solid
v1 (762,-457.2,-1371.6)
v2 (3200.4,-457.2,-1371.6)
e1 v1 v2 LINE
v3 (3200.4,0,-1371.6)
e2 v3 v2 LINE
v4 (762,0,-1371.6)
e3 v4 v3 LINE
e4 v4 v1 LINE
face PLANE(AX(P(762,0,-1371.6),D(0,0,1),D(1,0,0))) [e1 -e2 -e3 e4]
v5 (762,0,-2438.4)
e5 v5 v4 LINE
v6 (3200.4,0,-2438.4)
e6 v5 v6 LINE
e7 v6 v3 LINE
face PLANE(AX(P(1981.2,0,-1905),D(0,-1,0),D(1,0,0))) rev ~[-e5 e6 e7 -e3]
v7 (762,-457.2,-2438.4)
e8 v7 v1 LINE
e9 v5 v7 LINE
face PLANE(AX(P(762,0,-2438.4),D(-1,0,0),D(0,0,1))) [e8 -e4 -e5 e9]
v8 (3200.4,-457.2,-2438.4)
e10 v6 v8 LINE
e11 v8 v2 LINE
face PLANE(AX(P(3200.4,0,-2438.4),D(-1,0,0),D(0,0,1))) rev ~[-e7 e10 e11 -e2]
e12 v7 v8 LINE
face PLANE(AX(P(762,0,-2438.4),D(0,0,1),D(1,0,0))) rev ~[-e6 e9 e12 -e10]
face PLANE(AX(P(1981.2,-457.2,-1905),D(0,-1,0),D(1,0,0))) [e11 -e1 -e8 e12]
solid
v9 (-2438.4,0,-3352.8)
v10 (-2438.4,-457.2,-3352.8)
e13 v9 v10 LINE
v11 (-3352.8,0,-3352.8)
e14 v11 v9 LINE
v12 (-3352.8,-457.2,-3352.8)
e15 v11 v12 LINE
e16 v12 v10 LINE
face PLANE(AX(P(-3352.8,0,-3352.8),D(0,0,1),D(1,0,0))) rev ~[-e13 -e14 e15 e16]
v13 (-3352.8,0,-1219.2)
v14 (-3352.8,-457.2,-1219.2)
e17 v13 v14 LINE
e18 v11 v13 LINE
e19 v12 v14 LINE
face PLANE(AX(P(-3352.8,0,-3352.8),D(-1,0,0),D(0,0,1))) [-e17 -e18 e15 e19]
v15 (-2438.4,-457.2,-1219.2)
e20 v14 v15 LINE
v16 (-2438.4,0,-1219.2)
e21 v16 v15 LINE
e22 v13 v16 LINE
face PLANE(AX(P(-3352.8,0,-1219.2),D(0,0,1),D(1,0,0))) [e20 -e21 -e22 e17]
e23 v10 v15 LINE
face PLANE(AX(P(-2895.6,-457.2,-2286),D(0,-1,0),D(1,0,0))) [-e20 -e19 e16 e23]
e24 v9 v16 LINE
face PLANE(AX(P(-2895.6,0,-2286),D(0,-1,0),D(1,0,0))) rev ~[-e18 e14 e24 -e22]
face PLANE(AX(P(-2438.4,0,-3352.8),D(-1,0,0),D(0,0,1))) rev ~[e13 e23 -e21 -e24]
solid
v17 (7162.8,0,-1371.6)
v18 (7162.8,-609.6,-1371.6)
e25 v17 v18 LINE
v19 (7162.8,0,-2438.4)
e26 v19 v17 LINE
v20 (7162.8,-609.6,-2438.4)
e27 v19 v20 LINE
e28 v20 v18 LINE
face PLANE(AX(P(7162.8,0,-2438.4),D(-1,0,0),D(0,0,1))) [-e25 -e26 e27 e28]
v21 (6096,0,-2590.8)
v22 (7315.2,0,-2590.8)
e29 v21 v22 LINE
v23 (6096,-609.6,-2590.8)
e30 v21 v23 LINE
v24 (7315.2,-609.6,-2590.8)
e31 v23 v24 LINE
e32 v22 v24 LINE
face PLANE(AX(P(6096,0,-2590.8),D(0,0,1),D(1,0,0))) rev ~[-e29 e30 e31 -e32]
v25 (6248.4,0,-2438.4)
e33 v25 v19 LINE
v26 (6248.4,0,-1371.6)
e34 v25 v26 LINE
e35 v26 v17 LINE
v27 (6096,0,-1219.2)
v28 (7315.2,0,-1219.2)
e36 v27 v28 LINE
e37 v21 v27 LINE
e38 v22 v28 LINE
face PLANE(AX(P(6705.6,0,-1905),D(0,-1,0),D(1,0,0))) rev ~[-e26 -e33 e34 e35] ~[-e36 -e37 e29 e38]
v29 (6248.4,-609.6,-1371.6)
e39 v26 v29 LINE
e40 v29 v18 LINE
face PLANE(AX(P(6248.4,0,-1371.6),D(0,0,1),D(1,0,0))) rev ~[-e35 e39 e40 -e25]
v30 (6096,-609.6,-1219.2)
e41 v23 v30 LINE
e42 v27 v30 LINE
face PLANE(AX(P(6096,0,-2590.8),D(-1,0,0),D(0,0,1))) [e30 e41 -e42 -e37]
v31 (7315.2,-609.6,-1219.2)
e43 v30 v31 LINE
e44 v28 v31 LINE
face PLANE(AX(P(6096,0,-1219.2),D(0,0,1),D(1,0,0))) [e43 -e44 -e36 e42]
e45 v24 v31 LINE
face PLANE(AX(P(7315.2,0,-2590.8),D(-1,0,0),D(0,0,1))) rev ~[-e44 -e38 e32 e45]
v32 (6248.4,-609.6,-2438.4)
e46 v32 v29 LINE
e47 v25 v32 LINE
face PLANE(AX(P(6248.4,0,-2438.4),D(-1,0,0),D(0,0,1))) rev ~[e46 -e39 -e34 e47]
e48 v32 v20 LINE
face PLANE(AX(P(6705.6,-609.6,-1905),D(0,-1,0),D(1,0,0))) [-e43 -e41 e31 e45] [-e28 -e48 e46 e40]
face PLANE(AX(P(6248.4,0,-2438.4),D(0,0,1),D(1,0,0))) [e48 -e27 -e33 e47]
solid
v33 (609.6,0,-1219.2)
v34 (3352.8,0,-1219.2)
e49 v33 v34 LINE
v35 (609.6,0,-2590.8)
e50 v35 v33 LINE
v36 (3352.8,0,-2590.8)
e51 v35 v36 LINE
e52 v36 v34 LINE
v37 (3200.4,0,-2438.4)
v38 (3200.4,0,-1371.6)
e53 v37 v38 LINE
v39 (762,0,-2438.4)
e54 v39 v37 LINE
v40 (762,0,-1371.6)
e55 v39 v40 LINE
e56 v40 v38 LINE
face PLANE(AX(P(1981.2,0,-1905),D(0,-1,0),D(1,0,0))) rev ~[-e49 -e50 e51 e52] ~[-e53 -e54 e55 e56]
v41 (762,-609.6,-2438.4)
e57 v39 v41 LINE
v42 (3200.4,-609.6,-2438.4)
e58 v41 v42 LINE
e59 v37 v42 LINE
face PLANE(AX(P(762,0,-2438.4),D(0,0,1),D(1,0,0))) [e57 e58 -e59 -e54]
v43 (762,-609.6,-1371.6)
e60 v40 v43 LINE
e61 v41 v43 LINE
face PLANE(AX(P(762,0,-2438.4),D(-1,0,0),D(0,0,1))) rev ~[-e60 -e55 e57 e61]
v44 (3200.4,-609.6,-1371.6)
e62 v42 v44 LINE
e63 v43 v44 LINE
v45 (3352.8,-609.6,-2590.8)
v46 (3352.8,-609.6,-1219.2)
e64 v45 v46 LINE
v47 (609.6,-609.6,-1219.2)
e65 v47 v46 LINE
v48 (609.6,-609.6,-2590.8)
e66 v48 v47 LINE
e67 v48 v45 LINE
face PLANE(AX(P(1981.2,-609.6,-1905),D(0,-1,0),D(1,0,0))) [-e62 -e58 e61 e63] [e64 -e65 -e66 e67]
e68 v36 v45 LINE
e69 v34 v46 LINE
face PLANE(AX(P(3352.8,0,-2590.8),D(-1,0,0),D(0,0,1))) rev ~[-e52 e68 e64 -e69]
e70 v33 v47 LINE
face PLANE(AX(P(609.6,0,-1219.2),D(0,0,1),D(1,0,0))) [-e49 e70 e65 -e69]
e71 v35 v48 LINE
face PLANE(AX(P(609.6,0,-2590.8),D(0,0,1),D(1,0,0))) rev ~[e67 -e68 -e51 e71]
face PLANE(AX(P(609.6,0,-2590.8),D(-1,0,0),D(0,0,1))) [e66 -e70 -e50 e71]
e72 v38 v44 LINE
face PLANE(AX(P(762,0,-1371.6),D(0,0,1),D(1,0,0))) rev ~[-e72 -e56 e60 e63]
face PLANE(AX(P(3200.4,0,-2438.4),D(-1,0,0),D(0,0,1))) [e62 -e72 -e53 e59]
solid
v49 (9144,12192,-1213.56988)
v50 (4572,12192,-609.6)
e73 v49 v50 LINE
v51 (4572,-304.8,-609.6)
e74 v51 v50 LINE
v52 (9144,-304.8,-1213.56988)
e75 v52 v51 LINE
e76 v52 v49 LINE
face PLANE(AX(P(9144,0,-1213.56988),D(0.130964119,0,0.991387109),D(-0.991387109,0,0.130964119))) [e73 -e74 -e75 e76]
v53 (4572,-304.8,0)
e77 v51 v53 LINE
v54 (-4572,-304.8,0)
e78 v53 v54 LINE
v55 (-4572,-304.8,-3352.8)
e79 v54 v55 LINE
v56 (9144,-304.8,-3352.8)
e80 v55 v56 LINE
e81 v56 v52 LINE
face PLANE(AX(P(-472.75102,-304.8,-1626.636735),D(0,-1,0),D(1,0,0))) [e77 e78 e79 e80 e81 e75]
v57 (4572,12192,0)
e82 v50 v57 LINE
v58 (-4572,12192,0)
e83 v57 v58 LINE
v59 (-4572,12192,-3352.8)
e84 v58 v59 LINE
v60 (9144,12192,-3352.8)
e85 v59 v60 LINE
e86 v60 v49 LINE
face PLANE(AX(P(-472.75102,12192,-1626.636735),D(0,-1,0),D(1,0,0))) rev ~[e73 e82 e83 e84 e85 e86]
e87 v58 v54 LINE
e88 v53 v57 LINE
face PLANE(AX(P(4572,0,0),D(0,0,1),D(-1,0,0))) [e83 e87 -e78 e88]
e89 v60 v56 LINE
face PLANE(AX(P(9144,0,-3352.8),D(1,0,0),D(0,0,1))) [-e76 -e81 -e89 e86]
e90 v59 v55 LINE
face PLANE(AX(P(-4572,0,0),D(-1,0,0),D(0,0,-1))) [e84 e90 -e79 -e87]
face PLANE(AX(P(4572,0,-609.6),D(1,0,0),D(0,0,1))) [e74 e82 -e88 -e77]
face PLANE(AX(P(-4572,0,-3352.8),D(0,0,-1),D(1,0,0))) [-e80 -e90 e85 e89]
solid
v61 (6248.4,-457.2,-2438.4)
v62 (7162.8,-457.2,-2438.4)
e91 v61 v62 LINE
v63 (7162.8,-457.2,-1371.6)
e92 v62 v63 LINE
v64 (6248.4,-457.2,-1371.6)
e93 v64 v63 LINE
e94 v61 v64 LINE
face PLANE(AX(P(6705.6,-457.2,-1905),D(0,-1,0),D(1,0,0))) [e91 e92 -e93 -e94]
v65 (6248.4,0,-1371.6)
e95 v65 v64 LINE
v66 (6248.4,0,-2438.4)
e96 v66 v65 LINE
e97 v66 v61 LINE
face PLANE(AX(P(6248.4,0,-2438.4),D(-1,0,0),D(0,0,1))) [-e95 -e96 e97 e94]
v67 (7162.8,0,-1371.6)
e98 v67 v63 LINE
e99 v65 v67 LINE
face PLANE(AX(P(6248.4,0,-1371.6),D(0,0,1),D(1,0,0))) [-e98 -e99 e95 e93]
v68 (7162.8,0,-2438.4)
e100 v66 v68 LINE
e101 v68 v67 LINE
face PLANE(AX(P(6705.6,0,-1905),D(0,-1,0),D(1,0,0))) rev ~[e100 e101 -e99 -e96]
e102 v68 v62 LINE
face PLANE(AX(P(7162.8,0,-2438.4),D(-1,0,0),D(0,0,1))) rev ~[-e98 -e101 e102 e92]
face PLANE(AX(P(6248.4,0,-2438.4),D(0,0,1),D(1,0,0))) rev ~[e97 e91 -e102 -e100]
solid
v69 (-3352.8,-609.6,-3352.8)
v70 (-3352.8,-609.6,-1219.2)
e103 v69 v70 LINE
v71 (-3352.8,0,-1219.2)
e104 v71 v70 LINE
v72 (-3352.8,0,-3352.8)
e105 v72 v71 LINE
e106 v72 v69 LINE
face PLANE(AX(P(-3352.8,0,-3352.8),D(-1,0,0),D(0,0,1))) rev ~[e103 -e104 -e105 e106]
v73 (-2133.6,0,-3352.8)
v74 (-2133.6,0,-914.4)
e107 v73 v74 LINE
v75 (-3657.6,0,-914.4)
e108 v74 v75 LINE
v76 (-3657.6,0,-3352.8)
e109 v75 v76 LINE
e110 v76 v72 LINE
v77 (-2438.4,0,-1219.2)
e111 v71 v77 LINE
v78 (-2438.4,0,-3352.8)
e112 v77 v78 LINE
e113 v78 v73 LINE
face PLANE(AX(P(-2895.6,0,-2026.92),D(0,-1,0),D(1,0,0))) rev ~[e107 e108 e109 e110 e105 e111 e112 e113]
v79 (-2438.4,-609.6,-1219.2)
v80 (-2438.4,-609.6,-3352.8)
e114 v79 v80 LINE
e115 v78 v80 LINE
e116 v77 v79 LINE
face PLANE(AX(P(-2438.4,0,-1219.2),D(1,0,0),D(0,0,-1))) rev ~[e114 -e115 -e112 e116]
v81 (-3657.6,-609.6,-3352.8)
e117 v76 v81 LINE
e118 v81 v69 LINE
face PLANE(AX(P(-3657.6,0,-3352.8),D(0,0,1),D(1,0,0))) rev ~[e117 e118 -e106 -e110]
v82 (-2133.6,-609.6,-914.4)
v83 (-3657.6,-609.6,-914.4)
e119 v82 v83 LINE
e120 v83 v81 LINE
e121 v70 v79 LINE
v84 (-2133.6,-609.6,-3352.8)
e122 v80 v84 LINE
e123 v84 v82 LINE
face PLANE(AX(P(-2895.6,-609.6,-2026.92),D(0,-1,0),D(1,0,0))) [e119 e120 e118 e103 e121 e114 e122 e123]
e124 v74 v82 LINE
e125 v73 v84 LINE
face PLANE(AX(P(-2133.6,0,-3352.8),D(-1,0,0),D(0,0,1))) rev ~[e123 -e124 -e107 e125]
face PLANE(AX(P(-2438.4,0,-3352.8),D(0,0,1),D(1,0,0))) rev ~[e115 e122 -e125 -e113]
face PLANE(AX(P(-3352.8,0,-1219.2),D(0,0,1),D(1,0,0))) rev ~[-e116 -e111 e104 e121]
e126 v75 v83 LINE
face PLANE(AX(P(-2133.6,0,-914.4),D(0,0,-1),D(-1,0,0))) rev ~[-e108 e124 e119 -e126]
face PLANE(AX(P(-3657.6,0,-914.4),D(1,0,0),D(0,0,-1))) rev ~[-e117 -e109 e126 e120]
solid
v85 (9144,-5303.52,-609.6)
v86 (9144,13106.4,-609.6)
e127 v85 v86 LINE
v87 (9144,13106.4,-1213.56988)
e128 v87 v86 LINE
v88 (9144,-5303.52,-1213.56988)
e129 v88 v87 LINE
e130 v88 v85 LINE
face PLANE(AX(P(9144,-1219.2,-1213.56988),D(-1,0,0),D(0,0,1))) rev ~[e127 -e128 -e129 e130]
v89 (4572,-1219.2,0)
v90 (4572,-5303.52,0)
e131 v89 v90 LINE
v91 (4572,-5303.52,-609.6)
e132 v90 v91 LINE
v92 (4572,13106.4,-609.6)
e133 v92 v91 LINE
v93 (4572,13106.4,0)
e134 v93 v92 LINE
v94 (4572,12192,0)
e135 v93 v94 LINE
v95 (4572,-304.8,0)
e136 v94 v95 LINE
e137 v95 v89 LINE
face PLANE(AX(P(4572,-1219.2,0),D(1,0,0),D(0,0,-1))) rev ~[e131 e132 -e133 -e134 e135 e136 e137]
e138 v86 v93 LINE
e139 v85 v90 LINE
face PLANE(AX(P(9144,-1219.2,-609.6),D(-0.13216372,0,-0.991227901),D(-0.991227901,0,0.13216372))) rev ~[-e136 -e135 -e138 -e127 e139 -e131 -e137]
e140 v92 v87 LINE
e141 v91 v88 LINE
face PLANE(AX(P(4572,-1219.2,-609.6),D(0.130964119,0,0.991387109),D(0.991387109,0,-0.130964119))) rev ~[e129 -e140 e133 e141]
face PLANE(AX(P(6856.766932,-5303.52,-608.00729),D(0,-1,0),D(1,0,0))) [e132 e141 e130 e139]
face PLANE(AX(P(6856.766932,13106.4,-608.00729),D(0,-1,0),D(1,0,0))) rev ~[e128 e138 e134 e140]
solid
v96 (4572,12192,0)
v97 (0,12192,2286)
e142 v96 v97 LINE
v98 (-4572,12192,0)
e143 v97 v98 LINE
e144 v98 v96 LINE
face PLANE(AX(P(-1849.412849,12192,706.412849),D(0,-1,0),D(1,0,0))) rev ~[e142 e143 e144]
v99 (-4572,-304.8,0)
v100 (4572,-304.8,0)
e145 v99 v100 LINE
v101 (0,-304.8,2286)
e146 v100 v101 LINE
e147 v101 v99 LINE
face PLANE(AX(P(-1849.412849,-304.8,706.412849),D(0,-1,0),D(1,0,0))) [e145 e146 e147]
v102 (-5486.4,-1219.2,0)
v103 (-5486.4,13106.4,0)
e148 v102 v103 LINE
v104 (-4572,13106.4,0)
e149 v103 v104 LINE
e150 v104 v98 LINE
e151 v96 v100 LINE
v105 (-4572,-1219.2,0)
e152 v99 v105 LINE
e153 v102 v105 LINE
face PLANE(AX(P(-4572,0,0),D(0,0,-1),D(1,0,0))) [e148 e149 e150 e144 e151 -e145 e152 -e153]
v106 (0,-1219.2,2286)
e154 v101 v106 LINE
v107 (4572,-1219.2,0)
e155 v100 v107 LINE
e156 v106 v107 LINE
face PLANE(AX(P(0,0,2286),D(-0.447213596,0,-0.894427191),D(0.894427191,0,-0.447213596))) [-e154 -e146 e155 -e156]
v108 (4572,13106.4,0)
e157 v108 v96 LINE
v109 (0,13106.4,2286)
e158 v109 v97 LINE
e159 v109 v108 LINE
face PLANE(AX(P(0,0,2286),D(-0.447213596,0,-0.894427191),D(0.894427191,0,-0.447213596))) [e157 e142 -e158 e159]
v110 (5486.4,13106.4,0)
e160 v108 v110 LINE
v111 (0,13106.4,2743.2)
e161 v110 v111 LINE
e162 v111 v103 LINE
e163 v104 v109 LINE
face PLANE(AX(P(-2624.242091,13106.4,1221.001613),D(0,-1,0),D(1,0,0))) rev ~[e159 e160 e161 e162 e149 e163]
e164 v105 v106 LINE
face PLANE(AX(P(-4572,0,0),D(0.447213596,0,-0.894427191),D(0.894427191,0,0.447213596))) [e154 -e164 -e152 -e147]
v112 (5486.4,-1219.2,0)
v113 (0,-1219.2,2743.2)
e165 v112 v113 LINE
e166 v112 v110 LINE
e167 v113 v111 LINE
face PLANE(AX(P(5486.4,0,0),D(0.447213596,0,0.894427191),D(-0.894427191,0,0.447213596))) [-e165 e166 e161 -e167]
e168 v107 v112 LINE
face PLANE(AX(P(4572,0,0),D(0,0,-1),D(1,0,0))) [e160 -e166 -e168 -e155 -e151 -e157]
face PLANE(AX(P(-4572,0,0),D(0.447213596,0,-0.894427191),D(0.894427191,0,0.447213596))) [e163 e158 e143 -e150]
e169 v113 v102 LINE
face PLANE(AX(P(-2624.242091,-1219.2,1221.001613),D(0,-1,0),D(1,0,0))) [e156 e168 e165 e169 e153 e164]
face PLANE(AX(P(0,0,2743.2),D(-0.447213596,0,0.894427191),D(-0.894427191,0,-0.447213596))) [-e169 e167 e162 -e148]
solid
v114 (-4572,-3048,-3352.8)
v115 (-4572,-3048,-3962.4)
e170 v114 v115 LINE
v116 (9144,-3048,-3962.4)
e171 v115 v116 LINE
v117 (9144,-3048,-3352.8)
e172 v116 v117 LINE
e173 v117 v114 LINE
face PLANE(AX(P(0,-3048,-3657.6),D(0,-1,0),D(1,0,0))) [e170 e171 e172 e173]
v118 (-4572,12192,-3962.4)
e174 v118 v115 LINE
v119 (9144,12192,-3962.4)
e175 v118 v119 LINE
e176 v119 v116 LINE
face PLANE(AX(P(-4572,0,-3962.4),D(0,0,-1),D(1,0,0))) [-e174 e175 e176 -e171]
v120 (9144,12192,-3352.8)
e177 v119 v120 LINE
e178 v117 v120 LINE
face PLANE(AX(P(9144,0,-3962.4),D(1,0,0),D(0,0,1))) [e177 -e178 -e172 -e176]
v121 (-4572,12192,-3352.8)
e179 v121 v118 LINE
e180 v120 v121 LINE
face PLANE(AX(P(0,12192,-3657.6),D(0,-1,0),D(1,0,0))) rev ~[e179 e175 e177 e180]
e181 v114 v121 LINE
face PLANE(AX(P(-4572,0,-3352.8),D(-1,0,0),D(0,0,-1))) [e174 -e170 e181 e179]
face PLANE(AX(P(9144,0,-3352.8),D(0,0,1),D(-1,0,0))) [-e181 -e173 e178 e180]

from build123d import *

# Parameters (mm, degrees)
F1_DEPTH      = 1219.2
F1_DEPTH_BACK = 13106.4
F2_DEPTH      = 304.8
F2_DEPTH_BACK = 12192
F0_W          = 4572
F0_H          = 609.6
F3_DEPTH      = 3048
F3_DEPTH_BACK = 12192
F0_W_2        = 2743.2
F0_H_2        = 1371.6
F0_W_3        = 1219.2
F0_W_4        = 2438.4
F0_H_3        = 1066.8
F0_W_5        = 914.4
F0_H_4        = 2133.6
F4_DEPTH      = 304.8
F4_DEPTH_BACK = 12192
F5_DEPTH      = 457.2
F6_DEPTH      = 609.6
F7_DEPTH      = 4084.32
F7_DEPTH_BACK = 30.48


with BuildPart() as f1:
    # F0 (on Front) → F1 (new body, two sides)
    with BuildSketch(Plane.XZ) as f1_sk:
        Polygon((-5486.4, 0), (-4572, 0), (0, 2286), (0, 2743.2), align=None)
        Polygon((0, 2286), (4572, 0), (5486.4, 0), (0, 2743.2), align=None)
    extrude(amount=F1_DEPTH)
    extrude(f1_sk.sketch, amount=-F1_DEPTH_BACK)



with BuildPart() as f1b:
    # F0 (on Front) → F1, piece 2 (new body, two sides)
    with BuildSketch(Plane.XZ) as f1_2_sk:
        Polygon((9144, -609.6), (4572, 0), (4572, -609.6), (9144, -1213.5698795319), align=None)
    extrude(amount=F1_DEPTH)
    extrude(f1_2_sk.sketch, amount=-F1_DEPTH_BACK)


with BuildPart() as f1_1:
    add(f1.part)

    add(f1b.part)  # F2 merges F1b
    # F0 (on Front) → F2 (join, two sides)
    with BuildSketch(Plane.XZ) as f2_sk:
        Polygon((-4572, 0), (0, 0), (0, 2286), align=None)
        Polygon((0, 2286), (0, 0), (4572, 0), align=None)
    extrude(amount=F2_DEPTH)
    extrude(f2_sk.sketch, amount=-F2_DEPTH_BACK)

    # F7 (add, two sides): a face of the model
    f7_faces = [f1_1.faces().sort_by_distance(p)[0] for p in [
        (6854.4648498046, -1219.2, -607.7232931773),
    ]]
    extrude(f7_faces, amount=F7_DEPTH)
    extrude(f7_faces, amount=-F7_DEPTH_BACK)


with BuildPart() as f3:
    # F0 (on Front) → F3 (new body, two sides)
    with BuildSketch(Plane.XZ) as f3_sk:
        Polygon((-3657.6, -3352.8), (-4572, -3352.8), (-4572, -3962.4), (4572, -3962.4), (4572, -3352.8), (-2133.6, -3352.8), (-2438.4, -3352.8), (-3352.8, -3352.8), align=None)
        with Locations((6858, -3657.6)):
            Rectangle(F0_W, F0_H)
    extrude(amount=F3_DEPTH)
    extrude(f3_sk.sketch, amount=-F3_DEPTH_BACK)


with BuildPart() as f4:
    # F0 (on Front) → F4 (new body, two sides)
    with BuildSketch(Plane.XZ) as f4_sk:
        Polygon((4572, 0), (0, 0), (-4572, 0), (-4572, -3352.8), (-3657.6, -3352.8), (-3657.6, -914.4), (-2133.6, -914.4), (-2133.6, -3352.8), (4572, -3352.8), (4572, -609.6), align=None)
        with Locations((1981.2, -1905)):
            Rectangle(F0_W_2, F0_H_2, mode=Mode.SUBTRACT)
        Polygon((9144, -1213.5698795319), (4572, -609.6), (4572, -3352.8), (9144, -3352.8), align=None)
        with Locations((6705.6, -1905)):
            Rectangle(F0_W_3, F0_H_2, mode=Mode.SUBTRACT)
        with Locations((1981.2, -1905)):
            Rectangle(F0_W_2, F0_H_2)
        with Locations((1981.2, -1905)):
            Rectangle(F0_W_4, F0_H_3, mode=Mode.SUBTRACT)
        with Locations((1981.2, -1905)):
            Rectangle(F0_W_4, F0_H_3)
        with Locations((-2895.6, -2286)):
            Rectangle(F0_W_5, F0_H_4)
        Polygon((-3657.6, -914.4), (-3657.6, -3352.8), (-3352.8, -3352.8), (-3352.8, -1219.2), (-2438.4, -1219.2), (-2438.4, -3352.8), (-2133.6, -3352.8), (-2133.6, -914.4), align=None)
        with Locations((6705.6, -1905)):
            Rectangle(F0_W_3, F0_H_2)
        with Locations((6705.6, -1905)):
            Rectangle(F0_W_5, F0_H_3, mode=Mode.SUBTRACT)
        with Locations((6705.6, -1905)):
            Rectangle(F0_W_5, F0_H_3)
    extrude(amount=F4_DEPTH)
    extrude(f4_sk.sketch, amount=-F4_DEPTH_BACK)


with BuildPart() as f5:
    # F0 (on Front) → F5 (new body)
    with BuildSketch(Plane.XZ):
        with Locations((-2895.6, -2286)):
            Rectangle(F0_W_5, F0_H_4)
    extrude(amount=F5_DEPTH)


with BuildPart() as f5b:
    # F0 (on Front) → F5, piece 2 (new body)
    with BuildSketch(Plane.XZ):
        with Locations((1981.2, -1905)):
            Rectangle(F0_W_4, F0_H_3)
    extrude(amount=F5_DEPTH)


with BuildPart() as f5c:
    # F0 (on Front) → F5, piece 3 (new body)
    with BuildSketch(Plane.XZ):
        with Locations((6705.6, -1905)):
            Rectangle(F0_W_5, F0_H_3)
    extrude(amount=F5_DEPTH)


with BuildPart() as f6:
    # F0 (on Front) → F6 (new body)
    with BuildSketch(Plane.XZ):
        Polygon((-3657.6, -914.4), (-3657.6, -3352.8), (-3352.8, -3352.8), (-3352.8, -1219.2), (-2438.4, -1219.2), (-2438.4, -3352.8), (-2133.6, -3352.8), (-2133.6, -914.4), align=None)
    extrude(amount=F6_DEPTH)


with BuildPart() as f6b:
    # F0 (on Front) → F6, piece 2 (new body)
    with BuildSketch(Plane.XZ):
        with Locations((1981.2, -1905)):
            Rectangle(F0_W_2, F0_H_2)
        with Locations((1981.2, -1905)):
            Rectangle(F0_W_4, F0_H_3, mode=Mode.SUBTRACT)
    extrude(amount=F6_DEPTH)


with BuildPart() as f6c:
    # F0 (on Front) → F6, piece 3 (new body)
    with BuildSketch(Plane.XZ):
        with Locations((6705.6, -1905)):
            Rectangle(F0_W_3, F0_H_2)
        with Locations((6705.6, -1905)):
            Rectangle(F0_W_5, F0_H_3, mode=Mode.SUBTRACT)
    extrude(amount=F6_DEPTH)


solid = Compound([f1_1.part, f3.part, f4.part, f5.part, f5b.part, f5c.part, f6.part, f6b.part, f6c.part])
